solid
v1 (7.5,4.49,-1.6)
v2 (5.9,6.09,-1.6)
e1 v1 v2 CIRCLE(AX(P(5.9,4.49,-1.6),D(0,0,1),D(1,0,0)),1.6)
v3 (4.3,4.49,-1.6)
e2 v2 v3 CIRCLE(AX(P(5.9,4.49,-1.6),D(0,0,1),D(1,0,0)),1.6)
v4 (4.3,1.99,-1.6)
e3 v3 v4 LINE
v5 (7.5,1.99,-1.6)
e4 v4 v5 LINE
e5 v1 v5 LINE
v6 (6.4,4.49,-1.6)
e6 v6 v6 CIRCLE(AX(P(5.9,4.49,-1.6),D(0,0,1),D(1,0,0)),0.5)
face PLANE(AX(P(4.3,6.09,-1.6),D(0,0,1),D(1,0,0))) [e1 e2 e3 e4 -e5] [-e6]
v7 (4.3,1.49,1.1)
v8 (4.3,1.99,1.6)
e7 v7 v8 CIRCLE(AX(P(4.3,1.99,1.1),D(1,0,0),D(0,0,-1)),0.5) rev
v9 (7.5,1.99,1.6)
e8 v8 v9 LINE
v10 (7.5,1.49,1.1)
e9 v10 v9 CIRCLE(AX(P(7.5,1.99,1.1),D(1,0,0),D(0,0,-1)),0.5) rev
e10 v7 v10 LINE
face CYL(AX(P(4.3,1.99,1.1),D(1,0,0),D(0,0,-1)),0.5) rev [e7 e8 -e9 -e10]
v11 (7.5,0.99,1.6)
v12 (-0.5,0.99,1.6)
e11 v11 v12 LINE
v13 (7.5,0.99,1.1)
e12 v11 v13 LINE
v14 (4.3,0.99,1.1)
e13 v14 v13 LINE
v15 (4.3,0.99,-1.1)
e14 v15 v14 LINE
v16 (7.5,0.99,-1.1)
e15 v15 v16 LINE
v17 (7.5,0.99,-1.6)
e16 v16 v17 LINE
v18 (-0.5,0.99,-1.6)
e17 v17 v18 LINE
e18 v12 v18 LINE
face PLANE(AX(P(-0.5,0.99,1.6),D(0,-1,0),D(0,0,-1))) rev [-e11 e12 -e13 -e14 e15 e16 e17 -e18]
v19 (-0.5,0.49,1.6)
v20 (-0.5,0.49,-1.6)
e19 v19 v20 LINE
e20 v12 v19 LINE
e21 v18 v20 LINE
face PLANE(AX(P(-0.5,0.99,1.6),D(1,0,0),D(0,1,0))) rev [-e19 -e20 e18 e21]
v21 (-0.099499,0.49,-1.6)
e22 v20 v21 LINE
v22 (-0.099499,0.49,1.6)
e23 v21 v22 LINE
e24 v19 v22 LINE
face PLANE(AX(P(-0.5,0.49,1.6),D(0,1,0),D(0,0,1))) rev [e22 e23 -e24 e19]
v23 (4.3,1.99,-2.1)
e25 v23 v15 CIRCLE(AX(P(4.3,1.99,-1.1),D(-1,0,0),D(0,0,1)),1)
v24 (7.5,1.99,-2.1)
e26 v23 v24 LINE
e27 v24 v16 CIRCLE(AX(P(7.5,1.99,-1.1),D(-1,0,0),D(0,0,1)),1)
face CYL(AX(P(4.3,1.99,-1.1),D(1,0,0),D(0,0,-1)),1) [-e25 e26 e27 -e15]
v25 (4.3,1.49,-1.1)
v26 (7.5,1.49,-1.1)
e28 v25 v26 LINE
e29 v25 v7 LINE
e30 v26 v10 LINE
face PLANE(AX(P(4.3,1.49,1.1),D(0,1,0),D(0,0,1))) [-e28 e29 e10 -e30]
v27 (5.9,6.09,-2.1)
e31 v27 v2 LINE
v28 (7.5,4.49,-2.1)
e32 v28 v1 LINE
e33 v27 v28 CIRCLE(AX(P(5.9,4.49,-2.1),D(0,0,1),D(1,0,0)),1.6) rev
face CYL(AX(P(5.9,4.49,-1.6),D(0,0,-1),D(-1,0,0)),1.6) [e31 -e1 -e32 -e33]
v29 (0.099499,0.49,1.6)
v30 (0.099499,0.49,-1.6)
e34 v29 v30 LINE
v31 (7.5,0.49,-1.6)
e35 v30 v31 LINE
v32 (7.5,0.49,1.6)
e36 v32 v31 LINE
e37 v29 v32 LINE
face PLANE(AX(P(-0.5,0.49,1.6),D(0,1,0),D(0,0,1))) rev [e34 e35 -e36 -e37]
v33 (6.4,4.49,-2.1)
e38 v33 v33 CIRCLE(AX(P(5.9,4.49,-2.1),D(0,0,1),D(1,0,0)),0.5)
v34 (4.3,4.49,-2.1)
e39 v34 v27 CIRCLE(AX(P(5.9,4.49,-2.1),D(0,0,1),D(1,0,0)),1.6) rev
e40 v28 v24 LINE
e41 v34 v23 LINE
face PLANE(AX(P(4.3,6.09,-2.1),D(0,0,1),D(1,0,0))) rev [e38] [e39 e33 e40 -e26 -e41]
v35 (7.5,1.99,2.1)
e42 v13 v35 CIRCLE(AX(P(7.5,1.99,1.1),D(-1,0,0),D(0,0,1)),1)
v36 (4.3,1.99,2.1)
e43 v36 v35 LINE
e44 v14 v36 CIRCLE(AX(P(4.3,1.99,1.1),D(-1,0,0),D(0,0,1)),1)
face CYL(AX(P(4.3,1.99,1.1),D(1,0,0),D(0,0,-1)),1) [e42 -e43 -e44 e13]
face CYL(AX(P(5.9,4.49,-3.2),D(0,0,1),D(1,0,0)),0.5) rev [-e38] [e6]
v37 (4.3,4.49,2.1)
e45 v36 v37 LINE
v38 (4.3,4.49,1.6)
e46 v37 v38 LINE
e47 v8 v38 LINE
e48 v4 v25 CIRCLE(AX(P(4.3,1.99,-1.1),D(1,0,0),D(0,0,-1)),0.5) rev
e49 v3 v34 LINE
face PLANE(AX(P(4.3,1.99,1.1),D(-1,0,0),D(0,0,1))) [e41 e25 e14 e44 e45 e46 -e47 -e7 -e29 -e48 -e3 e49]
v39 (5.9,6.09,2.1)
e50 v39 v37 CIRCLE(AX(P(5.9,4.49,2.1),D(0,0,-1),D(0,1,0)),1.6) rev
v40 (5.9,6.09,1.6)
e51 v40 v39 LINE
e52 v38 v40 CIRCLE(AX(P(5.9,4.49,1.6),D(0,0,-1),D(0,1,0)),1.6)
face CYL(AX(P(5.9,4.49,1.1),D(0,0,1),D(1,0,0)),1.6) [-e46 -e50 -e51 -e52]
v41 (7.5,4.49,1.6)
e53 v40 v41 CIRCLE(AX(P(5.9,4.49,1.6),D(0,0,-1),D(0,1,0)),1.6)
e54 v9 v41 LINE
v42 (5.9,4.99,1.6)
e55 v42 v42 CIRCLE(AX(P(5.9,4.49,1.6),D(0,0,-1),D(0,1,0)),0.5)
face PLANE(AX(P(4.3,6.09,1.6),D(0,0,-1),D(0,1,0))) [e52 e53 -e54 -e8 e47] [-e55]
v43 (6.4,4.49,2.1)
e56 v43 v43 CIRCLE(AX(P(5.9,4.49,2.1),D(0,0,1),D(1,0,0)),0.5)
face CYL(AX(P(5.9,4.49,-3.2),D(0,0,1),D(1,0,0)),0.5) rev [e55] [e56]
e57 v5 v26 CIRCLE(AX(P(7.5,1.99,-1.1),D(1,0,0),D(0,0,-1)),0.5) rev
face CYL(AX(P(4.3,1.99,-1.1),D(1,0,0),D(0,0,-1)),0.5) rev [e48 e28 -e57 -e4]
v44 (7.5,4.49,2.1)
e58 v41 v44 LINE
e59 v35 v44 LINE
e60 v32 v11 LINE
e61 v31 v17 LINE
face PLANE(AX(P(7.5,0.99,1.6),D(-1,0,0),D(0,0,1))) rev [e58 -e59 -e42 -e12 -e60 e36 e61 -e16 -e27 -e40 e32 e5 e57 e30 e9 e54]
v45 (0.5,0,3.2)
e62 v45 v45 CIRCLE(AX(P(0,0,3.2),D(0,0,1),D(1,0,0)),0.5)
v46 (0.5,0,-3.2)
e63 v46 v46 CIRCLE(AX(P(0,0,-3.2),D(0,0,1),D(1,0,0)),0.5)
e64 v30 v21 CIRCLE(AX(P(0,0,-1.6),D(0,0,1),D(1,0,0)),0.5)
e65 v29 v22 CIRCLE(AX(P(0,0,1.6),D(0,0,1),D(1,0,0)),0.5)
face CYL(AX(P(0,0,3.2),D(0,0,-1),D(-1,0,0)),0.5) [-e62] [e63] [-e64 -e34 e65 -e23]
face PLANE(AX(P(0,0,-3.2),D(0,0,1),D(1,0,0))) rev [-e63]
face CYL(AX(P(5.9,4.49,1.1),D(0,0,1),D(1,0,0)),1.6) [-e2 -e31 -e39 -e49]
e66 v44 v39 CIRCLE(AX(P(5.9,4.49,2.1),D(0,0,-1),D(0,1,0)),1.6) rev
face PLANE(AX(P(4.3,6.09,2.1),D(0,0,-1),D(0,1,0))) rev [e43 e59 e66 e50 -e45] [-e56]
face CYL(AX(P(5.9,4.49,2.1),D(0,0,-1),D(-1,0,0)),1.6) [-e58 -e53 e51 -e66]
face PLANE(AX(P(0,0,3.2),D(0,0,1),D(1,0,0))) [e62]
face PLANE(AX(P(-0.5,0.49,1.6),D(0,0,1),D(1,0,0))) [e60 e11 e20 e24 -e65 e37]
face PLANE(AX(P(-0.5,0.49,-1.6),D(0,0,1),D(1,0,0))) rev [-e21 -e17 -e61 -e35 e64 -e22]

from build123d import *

# Parameters (mm, degrees)
ESQUISSE1_R             = 0.5
BASE_EXTRUSION_DEPTH    = 3.2
ESQUISSE2_W             = 8
ESQUISSE2_H             = 0.5
BOSS_EXTRU_3_DEPTH      = 1.6
BOSS_EXTRU_MINCE1_DEPTH = 3.2
ESQUISSE4_R             = 0.5
ENL_V_MAT_EXTRU_1_DEPTH = 12.01944191
CONG_1_R                = 1.6


with BuildPart() as part:
    # Esquisse1 → Base-Extrusion (new, symmetric)
    with BuildSketch(Plane.XY):
        Circle(ESQUISSE1_R)
    extrude(amount=BASE_EXTRUSION_DEPTH, both=True)

    # Esquisse2 → Boss.-Extru.3 (add, symmetric)
    with BuildSketch(Plane.XY):
        with Locations((3.5, 0.74)):
            Rectangle(ESQUISSE2_W, ESQUISSE2_H)
    extrude(amount=BOSS_EXTRU_3_DEPTH, both=True)

    # Esquisse3 → Boss.-Extru.-Mince1 (add)
    with BuildSketch(Plane(origin=(7.5, 0, 0), x_dir=(0, 0, -1), z_dir=(1, 0, 0))):
        with BuildLine():
            Line((-2.1, 6.09), (-2.1, 1.99))
            ThreePointArc((-2.1, 1.99), (-1.807106781, 1.282893219), (-1.1, 0.99))
            Line((-1.1, 0.99), (1.1, 0.99))
            ThreePointArc((1.1, 0.99), (1.807106781, 1.282893219), (2.1, 1.99))
            Line((2.1, 1.99), (2.1, 6.09))
            Line((2.1, 6.09), (1.6, 6.09))
            Line((1.6, 6.09), (1.6, 1.99))
            ThreePointArc((1.6, 1.99), (1.453553391, 1.636446609), (1.1, 1.49))
            Line((1.1, 1.49), (-1.1, 1.49))
            ThreePointArc((-1.1, 1.49), (-1.453553391, 1.636446609), (-1.6, 1.99))
            Line((-1.6, 1.99), (-1.6, 6.09))
            Line((-1.6, 6.09), (-2.1, 6.09))
        make_face()
    extrude(amount=-BOSS_EXTRU_MINCE1_DEPTH)

    # Esquisse4 → Enlèv. mat.-Extru.1 (cut, through all)
    with BuildSketch(Plane.XY.offset(2.1)):
        with Locations((5.9, 4.49)):
            Circle(ESQUISSE4_R)
    extrude(amount=-ENL_V_MAT_EXTRU_1_DEPTH, mode=Mode.SUBTRACT)

    # Congé1
    cong_1_edges = [part.edges().sort_by_distance(p)[0] for p in [
        (7.5, 6.09, 1.85),
        (7.5, 6.09, -1.85),
        (4.3, 6.09, 1.85),
        (4.3, 6.09, -1.85),
    ]]
    fillet(cong_1_edges, radius=CONG_1_R - 0.0001)  # a hair under: the kernel refuses the full size


solid = part.part
